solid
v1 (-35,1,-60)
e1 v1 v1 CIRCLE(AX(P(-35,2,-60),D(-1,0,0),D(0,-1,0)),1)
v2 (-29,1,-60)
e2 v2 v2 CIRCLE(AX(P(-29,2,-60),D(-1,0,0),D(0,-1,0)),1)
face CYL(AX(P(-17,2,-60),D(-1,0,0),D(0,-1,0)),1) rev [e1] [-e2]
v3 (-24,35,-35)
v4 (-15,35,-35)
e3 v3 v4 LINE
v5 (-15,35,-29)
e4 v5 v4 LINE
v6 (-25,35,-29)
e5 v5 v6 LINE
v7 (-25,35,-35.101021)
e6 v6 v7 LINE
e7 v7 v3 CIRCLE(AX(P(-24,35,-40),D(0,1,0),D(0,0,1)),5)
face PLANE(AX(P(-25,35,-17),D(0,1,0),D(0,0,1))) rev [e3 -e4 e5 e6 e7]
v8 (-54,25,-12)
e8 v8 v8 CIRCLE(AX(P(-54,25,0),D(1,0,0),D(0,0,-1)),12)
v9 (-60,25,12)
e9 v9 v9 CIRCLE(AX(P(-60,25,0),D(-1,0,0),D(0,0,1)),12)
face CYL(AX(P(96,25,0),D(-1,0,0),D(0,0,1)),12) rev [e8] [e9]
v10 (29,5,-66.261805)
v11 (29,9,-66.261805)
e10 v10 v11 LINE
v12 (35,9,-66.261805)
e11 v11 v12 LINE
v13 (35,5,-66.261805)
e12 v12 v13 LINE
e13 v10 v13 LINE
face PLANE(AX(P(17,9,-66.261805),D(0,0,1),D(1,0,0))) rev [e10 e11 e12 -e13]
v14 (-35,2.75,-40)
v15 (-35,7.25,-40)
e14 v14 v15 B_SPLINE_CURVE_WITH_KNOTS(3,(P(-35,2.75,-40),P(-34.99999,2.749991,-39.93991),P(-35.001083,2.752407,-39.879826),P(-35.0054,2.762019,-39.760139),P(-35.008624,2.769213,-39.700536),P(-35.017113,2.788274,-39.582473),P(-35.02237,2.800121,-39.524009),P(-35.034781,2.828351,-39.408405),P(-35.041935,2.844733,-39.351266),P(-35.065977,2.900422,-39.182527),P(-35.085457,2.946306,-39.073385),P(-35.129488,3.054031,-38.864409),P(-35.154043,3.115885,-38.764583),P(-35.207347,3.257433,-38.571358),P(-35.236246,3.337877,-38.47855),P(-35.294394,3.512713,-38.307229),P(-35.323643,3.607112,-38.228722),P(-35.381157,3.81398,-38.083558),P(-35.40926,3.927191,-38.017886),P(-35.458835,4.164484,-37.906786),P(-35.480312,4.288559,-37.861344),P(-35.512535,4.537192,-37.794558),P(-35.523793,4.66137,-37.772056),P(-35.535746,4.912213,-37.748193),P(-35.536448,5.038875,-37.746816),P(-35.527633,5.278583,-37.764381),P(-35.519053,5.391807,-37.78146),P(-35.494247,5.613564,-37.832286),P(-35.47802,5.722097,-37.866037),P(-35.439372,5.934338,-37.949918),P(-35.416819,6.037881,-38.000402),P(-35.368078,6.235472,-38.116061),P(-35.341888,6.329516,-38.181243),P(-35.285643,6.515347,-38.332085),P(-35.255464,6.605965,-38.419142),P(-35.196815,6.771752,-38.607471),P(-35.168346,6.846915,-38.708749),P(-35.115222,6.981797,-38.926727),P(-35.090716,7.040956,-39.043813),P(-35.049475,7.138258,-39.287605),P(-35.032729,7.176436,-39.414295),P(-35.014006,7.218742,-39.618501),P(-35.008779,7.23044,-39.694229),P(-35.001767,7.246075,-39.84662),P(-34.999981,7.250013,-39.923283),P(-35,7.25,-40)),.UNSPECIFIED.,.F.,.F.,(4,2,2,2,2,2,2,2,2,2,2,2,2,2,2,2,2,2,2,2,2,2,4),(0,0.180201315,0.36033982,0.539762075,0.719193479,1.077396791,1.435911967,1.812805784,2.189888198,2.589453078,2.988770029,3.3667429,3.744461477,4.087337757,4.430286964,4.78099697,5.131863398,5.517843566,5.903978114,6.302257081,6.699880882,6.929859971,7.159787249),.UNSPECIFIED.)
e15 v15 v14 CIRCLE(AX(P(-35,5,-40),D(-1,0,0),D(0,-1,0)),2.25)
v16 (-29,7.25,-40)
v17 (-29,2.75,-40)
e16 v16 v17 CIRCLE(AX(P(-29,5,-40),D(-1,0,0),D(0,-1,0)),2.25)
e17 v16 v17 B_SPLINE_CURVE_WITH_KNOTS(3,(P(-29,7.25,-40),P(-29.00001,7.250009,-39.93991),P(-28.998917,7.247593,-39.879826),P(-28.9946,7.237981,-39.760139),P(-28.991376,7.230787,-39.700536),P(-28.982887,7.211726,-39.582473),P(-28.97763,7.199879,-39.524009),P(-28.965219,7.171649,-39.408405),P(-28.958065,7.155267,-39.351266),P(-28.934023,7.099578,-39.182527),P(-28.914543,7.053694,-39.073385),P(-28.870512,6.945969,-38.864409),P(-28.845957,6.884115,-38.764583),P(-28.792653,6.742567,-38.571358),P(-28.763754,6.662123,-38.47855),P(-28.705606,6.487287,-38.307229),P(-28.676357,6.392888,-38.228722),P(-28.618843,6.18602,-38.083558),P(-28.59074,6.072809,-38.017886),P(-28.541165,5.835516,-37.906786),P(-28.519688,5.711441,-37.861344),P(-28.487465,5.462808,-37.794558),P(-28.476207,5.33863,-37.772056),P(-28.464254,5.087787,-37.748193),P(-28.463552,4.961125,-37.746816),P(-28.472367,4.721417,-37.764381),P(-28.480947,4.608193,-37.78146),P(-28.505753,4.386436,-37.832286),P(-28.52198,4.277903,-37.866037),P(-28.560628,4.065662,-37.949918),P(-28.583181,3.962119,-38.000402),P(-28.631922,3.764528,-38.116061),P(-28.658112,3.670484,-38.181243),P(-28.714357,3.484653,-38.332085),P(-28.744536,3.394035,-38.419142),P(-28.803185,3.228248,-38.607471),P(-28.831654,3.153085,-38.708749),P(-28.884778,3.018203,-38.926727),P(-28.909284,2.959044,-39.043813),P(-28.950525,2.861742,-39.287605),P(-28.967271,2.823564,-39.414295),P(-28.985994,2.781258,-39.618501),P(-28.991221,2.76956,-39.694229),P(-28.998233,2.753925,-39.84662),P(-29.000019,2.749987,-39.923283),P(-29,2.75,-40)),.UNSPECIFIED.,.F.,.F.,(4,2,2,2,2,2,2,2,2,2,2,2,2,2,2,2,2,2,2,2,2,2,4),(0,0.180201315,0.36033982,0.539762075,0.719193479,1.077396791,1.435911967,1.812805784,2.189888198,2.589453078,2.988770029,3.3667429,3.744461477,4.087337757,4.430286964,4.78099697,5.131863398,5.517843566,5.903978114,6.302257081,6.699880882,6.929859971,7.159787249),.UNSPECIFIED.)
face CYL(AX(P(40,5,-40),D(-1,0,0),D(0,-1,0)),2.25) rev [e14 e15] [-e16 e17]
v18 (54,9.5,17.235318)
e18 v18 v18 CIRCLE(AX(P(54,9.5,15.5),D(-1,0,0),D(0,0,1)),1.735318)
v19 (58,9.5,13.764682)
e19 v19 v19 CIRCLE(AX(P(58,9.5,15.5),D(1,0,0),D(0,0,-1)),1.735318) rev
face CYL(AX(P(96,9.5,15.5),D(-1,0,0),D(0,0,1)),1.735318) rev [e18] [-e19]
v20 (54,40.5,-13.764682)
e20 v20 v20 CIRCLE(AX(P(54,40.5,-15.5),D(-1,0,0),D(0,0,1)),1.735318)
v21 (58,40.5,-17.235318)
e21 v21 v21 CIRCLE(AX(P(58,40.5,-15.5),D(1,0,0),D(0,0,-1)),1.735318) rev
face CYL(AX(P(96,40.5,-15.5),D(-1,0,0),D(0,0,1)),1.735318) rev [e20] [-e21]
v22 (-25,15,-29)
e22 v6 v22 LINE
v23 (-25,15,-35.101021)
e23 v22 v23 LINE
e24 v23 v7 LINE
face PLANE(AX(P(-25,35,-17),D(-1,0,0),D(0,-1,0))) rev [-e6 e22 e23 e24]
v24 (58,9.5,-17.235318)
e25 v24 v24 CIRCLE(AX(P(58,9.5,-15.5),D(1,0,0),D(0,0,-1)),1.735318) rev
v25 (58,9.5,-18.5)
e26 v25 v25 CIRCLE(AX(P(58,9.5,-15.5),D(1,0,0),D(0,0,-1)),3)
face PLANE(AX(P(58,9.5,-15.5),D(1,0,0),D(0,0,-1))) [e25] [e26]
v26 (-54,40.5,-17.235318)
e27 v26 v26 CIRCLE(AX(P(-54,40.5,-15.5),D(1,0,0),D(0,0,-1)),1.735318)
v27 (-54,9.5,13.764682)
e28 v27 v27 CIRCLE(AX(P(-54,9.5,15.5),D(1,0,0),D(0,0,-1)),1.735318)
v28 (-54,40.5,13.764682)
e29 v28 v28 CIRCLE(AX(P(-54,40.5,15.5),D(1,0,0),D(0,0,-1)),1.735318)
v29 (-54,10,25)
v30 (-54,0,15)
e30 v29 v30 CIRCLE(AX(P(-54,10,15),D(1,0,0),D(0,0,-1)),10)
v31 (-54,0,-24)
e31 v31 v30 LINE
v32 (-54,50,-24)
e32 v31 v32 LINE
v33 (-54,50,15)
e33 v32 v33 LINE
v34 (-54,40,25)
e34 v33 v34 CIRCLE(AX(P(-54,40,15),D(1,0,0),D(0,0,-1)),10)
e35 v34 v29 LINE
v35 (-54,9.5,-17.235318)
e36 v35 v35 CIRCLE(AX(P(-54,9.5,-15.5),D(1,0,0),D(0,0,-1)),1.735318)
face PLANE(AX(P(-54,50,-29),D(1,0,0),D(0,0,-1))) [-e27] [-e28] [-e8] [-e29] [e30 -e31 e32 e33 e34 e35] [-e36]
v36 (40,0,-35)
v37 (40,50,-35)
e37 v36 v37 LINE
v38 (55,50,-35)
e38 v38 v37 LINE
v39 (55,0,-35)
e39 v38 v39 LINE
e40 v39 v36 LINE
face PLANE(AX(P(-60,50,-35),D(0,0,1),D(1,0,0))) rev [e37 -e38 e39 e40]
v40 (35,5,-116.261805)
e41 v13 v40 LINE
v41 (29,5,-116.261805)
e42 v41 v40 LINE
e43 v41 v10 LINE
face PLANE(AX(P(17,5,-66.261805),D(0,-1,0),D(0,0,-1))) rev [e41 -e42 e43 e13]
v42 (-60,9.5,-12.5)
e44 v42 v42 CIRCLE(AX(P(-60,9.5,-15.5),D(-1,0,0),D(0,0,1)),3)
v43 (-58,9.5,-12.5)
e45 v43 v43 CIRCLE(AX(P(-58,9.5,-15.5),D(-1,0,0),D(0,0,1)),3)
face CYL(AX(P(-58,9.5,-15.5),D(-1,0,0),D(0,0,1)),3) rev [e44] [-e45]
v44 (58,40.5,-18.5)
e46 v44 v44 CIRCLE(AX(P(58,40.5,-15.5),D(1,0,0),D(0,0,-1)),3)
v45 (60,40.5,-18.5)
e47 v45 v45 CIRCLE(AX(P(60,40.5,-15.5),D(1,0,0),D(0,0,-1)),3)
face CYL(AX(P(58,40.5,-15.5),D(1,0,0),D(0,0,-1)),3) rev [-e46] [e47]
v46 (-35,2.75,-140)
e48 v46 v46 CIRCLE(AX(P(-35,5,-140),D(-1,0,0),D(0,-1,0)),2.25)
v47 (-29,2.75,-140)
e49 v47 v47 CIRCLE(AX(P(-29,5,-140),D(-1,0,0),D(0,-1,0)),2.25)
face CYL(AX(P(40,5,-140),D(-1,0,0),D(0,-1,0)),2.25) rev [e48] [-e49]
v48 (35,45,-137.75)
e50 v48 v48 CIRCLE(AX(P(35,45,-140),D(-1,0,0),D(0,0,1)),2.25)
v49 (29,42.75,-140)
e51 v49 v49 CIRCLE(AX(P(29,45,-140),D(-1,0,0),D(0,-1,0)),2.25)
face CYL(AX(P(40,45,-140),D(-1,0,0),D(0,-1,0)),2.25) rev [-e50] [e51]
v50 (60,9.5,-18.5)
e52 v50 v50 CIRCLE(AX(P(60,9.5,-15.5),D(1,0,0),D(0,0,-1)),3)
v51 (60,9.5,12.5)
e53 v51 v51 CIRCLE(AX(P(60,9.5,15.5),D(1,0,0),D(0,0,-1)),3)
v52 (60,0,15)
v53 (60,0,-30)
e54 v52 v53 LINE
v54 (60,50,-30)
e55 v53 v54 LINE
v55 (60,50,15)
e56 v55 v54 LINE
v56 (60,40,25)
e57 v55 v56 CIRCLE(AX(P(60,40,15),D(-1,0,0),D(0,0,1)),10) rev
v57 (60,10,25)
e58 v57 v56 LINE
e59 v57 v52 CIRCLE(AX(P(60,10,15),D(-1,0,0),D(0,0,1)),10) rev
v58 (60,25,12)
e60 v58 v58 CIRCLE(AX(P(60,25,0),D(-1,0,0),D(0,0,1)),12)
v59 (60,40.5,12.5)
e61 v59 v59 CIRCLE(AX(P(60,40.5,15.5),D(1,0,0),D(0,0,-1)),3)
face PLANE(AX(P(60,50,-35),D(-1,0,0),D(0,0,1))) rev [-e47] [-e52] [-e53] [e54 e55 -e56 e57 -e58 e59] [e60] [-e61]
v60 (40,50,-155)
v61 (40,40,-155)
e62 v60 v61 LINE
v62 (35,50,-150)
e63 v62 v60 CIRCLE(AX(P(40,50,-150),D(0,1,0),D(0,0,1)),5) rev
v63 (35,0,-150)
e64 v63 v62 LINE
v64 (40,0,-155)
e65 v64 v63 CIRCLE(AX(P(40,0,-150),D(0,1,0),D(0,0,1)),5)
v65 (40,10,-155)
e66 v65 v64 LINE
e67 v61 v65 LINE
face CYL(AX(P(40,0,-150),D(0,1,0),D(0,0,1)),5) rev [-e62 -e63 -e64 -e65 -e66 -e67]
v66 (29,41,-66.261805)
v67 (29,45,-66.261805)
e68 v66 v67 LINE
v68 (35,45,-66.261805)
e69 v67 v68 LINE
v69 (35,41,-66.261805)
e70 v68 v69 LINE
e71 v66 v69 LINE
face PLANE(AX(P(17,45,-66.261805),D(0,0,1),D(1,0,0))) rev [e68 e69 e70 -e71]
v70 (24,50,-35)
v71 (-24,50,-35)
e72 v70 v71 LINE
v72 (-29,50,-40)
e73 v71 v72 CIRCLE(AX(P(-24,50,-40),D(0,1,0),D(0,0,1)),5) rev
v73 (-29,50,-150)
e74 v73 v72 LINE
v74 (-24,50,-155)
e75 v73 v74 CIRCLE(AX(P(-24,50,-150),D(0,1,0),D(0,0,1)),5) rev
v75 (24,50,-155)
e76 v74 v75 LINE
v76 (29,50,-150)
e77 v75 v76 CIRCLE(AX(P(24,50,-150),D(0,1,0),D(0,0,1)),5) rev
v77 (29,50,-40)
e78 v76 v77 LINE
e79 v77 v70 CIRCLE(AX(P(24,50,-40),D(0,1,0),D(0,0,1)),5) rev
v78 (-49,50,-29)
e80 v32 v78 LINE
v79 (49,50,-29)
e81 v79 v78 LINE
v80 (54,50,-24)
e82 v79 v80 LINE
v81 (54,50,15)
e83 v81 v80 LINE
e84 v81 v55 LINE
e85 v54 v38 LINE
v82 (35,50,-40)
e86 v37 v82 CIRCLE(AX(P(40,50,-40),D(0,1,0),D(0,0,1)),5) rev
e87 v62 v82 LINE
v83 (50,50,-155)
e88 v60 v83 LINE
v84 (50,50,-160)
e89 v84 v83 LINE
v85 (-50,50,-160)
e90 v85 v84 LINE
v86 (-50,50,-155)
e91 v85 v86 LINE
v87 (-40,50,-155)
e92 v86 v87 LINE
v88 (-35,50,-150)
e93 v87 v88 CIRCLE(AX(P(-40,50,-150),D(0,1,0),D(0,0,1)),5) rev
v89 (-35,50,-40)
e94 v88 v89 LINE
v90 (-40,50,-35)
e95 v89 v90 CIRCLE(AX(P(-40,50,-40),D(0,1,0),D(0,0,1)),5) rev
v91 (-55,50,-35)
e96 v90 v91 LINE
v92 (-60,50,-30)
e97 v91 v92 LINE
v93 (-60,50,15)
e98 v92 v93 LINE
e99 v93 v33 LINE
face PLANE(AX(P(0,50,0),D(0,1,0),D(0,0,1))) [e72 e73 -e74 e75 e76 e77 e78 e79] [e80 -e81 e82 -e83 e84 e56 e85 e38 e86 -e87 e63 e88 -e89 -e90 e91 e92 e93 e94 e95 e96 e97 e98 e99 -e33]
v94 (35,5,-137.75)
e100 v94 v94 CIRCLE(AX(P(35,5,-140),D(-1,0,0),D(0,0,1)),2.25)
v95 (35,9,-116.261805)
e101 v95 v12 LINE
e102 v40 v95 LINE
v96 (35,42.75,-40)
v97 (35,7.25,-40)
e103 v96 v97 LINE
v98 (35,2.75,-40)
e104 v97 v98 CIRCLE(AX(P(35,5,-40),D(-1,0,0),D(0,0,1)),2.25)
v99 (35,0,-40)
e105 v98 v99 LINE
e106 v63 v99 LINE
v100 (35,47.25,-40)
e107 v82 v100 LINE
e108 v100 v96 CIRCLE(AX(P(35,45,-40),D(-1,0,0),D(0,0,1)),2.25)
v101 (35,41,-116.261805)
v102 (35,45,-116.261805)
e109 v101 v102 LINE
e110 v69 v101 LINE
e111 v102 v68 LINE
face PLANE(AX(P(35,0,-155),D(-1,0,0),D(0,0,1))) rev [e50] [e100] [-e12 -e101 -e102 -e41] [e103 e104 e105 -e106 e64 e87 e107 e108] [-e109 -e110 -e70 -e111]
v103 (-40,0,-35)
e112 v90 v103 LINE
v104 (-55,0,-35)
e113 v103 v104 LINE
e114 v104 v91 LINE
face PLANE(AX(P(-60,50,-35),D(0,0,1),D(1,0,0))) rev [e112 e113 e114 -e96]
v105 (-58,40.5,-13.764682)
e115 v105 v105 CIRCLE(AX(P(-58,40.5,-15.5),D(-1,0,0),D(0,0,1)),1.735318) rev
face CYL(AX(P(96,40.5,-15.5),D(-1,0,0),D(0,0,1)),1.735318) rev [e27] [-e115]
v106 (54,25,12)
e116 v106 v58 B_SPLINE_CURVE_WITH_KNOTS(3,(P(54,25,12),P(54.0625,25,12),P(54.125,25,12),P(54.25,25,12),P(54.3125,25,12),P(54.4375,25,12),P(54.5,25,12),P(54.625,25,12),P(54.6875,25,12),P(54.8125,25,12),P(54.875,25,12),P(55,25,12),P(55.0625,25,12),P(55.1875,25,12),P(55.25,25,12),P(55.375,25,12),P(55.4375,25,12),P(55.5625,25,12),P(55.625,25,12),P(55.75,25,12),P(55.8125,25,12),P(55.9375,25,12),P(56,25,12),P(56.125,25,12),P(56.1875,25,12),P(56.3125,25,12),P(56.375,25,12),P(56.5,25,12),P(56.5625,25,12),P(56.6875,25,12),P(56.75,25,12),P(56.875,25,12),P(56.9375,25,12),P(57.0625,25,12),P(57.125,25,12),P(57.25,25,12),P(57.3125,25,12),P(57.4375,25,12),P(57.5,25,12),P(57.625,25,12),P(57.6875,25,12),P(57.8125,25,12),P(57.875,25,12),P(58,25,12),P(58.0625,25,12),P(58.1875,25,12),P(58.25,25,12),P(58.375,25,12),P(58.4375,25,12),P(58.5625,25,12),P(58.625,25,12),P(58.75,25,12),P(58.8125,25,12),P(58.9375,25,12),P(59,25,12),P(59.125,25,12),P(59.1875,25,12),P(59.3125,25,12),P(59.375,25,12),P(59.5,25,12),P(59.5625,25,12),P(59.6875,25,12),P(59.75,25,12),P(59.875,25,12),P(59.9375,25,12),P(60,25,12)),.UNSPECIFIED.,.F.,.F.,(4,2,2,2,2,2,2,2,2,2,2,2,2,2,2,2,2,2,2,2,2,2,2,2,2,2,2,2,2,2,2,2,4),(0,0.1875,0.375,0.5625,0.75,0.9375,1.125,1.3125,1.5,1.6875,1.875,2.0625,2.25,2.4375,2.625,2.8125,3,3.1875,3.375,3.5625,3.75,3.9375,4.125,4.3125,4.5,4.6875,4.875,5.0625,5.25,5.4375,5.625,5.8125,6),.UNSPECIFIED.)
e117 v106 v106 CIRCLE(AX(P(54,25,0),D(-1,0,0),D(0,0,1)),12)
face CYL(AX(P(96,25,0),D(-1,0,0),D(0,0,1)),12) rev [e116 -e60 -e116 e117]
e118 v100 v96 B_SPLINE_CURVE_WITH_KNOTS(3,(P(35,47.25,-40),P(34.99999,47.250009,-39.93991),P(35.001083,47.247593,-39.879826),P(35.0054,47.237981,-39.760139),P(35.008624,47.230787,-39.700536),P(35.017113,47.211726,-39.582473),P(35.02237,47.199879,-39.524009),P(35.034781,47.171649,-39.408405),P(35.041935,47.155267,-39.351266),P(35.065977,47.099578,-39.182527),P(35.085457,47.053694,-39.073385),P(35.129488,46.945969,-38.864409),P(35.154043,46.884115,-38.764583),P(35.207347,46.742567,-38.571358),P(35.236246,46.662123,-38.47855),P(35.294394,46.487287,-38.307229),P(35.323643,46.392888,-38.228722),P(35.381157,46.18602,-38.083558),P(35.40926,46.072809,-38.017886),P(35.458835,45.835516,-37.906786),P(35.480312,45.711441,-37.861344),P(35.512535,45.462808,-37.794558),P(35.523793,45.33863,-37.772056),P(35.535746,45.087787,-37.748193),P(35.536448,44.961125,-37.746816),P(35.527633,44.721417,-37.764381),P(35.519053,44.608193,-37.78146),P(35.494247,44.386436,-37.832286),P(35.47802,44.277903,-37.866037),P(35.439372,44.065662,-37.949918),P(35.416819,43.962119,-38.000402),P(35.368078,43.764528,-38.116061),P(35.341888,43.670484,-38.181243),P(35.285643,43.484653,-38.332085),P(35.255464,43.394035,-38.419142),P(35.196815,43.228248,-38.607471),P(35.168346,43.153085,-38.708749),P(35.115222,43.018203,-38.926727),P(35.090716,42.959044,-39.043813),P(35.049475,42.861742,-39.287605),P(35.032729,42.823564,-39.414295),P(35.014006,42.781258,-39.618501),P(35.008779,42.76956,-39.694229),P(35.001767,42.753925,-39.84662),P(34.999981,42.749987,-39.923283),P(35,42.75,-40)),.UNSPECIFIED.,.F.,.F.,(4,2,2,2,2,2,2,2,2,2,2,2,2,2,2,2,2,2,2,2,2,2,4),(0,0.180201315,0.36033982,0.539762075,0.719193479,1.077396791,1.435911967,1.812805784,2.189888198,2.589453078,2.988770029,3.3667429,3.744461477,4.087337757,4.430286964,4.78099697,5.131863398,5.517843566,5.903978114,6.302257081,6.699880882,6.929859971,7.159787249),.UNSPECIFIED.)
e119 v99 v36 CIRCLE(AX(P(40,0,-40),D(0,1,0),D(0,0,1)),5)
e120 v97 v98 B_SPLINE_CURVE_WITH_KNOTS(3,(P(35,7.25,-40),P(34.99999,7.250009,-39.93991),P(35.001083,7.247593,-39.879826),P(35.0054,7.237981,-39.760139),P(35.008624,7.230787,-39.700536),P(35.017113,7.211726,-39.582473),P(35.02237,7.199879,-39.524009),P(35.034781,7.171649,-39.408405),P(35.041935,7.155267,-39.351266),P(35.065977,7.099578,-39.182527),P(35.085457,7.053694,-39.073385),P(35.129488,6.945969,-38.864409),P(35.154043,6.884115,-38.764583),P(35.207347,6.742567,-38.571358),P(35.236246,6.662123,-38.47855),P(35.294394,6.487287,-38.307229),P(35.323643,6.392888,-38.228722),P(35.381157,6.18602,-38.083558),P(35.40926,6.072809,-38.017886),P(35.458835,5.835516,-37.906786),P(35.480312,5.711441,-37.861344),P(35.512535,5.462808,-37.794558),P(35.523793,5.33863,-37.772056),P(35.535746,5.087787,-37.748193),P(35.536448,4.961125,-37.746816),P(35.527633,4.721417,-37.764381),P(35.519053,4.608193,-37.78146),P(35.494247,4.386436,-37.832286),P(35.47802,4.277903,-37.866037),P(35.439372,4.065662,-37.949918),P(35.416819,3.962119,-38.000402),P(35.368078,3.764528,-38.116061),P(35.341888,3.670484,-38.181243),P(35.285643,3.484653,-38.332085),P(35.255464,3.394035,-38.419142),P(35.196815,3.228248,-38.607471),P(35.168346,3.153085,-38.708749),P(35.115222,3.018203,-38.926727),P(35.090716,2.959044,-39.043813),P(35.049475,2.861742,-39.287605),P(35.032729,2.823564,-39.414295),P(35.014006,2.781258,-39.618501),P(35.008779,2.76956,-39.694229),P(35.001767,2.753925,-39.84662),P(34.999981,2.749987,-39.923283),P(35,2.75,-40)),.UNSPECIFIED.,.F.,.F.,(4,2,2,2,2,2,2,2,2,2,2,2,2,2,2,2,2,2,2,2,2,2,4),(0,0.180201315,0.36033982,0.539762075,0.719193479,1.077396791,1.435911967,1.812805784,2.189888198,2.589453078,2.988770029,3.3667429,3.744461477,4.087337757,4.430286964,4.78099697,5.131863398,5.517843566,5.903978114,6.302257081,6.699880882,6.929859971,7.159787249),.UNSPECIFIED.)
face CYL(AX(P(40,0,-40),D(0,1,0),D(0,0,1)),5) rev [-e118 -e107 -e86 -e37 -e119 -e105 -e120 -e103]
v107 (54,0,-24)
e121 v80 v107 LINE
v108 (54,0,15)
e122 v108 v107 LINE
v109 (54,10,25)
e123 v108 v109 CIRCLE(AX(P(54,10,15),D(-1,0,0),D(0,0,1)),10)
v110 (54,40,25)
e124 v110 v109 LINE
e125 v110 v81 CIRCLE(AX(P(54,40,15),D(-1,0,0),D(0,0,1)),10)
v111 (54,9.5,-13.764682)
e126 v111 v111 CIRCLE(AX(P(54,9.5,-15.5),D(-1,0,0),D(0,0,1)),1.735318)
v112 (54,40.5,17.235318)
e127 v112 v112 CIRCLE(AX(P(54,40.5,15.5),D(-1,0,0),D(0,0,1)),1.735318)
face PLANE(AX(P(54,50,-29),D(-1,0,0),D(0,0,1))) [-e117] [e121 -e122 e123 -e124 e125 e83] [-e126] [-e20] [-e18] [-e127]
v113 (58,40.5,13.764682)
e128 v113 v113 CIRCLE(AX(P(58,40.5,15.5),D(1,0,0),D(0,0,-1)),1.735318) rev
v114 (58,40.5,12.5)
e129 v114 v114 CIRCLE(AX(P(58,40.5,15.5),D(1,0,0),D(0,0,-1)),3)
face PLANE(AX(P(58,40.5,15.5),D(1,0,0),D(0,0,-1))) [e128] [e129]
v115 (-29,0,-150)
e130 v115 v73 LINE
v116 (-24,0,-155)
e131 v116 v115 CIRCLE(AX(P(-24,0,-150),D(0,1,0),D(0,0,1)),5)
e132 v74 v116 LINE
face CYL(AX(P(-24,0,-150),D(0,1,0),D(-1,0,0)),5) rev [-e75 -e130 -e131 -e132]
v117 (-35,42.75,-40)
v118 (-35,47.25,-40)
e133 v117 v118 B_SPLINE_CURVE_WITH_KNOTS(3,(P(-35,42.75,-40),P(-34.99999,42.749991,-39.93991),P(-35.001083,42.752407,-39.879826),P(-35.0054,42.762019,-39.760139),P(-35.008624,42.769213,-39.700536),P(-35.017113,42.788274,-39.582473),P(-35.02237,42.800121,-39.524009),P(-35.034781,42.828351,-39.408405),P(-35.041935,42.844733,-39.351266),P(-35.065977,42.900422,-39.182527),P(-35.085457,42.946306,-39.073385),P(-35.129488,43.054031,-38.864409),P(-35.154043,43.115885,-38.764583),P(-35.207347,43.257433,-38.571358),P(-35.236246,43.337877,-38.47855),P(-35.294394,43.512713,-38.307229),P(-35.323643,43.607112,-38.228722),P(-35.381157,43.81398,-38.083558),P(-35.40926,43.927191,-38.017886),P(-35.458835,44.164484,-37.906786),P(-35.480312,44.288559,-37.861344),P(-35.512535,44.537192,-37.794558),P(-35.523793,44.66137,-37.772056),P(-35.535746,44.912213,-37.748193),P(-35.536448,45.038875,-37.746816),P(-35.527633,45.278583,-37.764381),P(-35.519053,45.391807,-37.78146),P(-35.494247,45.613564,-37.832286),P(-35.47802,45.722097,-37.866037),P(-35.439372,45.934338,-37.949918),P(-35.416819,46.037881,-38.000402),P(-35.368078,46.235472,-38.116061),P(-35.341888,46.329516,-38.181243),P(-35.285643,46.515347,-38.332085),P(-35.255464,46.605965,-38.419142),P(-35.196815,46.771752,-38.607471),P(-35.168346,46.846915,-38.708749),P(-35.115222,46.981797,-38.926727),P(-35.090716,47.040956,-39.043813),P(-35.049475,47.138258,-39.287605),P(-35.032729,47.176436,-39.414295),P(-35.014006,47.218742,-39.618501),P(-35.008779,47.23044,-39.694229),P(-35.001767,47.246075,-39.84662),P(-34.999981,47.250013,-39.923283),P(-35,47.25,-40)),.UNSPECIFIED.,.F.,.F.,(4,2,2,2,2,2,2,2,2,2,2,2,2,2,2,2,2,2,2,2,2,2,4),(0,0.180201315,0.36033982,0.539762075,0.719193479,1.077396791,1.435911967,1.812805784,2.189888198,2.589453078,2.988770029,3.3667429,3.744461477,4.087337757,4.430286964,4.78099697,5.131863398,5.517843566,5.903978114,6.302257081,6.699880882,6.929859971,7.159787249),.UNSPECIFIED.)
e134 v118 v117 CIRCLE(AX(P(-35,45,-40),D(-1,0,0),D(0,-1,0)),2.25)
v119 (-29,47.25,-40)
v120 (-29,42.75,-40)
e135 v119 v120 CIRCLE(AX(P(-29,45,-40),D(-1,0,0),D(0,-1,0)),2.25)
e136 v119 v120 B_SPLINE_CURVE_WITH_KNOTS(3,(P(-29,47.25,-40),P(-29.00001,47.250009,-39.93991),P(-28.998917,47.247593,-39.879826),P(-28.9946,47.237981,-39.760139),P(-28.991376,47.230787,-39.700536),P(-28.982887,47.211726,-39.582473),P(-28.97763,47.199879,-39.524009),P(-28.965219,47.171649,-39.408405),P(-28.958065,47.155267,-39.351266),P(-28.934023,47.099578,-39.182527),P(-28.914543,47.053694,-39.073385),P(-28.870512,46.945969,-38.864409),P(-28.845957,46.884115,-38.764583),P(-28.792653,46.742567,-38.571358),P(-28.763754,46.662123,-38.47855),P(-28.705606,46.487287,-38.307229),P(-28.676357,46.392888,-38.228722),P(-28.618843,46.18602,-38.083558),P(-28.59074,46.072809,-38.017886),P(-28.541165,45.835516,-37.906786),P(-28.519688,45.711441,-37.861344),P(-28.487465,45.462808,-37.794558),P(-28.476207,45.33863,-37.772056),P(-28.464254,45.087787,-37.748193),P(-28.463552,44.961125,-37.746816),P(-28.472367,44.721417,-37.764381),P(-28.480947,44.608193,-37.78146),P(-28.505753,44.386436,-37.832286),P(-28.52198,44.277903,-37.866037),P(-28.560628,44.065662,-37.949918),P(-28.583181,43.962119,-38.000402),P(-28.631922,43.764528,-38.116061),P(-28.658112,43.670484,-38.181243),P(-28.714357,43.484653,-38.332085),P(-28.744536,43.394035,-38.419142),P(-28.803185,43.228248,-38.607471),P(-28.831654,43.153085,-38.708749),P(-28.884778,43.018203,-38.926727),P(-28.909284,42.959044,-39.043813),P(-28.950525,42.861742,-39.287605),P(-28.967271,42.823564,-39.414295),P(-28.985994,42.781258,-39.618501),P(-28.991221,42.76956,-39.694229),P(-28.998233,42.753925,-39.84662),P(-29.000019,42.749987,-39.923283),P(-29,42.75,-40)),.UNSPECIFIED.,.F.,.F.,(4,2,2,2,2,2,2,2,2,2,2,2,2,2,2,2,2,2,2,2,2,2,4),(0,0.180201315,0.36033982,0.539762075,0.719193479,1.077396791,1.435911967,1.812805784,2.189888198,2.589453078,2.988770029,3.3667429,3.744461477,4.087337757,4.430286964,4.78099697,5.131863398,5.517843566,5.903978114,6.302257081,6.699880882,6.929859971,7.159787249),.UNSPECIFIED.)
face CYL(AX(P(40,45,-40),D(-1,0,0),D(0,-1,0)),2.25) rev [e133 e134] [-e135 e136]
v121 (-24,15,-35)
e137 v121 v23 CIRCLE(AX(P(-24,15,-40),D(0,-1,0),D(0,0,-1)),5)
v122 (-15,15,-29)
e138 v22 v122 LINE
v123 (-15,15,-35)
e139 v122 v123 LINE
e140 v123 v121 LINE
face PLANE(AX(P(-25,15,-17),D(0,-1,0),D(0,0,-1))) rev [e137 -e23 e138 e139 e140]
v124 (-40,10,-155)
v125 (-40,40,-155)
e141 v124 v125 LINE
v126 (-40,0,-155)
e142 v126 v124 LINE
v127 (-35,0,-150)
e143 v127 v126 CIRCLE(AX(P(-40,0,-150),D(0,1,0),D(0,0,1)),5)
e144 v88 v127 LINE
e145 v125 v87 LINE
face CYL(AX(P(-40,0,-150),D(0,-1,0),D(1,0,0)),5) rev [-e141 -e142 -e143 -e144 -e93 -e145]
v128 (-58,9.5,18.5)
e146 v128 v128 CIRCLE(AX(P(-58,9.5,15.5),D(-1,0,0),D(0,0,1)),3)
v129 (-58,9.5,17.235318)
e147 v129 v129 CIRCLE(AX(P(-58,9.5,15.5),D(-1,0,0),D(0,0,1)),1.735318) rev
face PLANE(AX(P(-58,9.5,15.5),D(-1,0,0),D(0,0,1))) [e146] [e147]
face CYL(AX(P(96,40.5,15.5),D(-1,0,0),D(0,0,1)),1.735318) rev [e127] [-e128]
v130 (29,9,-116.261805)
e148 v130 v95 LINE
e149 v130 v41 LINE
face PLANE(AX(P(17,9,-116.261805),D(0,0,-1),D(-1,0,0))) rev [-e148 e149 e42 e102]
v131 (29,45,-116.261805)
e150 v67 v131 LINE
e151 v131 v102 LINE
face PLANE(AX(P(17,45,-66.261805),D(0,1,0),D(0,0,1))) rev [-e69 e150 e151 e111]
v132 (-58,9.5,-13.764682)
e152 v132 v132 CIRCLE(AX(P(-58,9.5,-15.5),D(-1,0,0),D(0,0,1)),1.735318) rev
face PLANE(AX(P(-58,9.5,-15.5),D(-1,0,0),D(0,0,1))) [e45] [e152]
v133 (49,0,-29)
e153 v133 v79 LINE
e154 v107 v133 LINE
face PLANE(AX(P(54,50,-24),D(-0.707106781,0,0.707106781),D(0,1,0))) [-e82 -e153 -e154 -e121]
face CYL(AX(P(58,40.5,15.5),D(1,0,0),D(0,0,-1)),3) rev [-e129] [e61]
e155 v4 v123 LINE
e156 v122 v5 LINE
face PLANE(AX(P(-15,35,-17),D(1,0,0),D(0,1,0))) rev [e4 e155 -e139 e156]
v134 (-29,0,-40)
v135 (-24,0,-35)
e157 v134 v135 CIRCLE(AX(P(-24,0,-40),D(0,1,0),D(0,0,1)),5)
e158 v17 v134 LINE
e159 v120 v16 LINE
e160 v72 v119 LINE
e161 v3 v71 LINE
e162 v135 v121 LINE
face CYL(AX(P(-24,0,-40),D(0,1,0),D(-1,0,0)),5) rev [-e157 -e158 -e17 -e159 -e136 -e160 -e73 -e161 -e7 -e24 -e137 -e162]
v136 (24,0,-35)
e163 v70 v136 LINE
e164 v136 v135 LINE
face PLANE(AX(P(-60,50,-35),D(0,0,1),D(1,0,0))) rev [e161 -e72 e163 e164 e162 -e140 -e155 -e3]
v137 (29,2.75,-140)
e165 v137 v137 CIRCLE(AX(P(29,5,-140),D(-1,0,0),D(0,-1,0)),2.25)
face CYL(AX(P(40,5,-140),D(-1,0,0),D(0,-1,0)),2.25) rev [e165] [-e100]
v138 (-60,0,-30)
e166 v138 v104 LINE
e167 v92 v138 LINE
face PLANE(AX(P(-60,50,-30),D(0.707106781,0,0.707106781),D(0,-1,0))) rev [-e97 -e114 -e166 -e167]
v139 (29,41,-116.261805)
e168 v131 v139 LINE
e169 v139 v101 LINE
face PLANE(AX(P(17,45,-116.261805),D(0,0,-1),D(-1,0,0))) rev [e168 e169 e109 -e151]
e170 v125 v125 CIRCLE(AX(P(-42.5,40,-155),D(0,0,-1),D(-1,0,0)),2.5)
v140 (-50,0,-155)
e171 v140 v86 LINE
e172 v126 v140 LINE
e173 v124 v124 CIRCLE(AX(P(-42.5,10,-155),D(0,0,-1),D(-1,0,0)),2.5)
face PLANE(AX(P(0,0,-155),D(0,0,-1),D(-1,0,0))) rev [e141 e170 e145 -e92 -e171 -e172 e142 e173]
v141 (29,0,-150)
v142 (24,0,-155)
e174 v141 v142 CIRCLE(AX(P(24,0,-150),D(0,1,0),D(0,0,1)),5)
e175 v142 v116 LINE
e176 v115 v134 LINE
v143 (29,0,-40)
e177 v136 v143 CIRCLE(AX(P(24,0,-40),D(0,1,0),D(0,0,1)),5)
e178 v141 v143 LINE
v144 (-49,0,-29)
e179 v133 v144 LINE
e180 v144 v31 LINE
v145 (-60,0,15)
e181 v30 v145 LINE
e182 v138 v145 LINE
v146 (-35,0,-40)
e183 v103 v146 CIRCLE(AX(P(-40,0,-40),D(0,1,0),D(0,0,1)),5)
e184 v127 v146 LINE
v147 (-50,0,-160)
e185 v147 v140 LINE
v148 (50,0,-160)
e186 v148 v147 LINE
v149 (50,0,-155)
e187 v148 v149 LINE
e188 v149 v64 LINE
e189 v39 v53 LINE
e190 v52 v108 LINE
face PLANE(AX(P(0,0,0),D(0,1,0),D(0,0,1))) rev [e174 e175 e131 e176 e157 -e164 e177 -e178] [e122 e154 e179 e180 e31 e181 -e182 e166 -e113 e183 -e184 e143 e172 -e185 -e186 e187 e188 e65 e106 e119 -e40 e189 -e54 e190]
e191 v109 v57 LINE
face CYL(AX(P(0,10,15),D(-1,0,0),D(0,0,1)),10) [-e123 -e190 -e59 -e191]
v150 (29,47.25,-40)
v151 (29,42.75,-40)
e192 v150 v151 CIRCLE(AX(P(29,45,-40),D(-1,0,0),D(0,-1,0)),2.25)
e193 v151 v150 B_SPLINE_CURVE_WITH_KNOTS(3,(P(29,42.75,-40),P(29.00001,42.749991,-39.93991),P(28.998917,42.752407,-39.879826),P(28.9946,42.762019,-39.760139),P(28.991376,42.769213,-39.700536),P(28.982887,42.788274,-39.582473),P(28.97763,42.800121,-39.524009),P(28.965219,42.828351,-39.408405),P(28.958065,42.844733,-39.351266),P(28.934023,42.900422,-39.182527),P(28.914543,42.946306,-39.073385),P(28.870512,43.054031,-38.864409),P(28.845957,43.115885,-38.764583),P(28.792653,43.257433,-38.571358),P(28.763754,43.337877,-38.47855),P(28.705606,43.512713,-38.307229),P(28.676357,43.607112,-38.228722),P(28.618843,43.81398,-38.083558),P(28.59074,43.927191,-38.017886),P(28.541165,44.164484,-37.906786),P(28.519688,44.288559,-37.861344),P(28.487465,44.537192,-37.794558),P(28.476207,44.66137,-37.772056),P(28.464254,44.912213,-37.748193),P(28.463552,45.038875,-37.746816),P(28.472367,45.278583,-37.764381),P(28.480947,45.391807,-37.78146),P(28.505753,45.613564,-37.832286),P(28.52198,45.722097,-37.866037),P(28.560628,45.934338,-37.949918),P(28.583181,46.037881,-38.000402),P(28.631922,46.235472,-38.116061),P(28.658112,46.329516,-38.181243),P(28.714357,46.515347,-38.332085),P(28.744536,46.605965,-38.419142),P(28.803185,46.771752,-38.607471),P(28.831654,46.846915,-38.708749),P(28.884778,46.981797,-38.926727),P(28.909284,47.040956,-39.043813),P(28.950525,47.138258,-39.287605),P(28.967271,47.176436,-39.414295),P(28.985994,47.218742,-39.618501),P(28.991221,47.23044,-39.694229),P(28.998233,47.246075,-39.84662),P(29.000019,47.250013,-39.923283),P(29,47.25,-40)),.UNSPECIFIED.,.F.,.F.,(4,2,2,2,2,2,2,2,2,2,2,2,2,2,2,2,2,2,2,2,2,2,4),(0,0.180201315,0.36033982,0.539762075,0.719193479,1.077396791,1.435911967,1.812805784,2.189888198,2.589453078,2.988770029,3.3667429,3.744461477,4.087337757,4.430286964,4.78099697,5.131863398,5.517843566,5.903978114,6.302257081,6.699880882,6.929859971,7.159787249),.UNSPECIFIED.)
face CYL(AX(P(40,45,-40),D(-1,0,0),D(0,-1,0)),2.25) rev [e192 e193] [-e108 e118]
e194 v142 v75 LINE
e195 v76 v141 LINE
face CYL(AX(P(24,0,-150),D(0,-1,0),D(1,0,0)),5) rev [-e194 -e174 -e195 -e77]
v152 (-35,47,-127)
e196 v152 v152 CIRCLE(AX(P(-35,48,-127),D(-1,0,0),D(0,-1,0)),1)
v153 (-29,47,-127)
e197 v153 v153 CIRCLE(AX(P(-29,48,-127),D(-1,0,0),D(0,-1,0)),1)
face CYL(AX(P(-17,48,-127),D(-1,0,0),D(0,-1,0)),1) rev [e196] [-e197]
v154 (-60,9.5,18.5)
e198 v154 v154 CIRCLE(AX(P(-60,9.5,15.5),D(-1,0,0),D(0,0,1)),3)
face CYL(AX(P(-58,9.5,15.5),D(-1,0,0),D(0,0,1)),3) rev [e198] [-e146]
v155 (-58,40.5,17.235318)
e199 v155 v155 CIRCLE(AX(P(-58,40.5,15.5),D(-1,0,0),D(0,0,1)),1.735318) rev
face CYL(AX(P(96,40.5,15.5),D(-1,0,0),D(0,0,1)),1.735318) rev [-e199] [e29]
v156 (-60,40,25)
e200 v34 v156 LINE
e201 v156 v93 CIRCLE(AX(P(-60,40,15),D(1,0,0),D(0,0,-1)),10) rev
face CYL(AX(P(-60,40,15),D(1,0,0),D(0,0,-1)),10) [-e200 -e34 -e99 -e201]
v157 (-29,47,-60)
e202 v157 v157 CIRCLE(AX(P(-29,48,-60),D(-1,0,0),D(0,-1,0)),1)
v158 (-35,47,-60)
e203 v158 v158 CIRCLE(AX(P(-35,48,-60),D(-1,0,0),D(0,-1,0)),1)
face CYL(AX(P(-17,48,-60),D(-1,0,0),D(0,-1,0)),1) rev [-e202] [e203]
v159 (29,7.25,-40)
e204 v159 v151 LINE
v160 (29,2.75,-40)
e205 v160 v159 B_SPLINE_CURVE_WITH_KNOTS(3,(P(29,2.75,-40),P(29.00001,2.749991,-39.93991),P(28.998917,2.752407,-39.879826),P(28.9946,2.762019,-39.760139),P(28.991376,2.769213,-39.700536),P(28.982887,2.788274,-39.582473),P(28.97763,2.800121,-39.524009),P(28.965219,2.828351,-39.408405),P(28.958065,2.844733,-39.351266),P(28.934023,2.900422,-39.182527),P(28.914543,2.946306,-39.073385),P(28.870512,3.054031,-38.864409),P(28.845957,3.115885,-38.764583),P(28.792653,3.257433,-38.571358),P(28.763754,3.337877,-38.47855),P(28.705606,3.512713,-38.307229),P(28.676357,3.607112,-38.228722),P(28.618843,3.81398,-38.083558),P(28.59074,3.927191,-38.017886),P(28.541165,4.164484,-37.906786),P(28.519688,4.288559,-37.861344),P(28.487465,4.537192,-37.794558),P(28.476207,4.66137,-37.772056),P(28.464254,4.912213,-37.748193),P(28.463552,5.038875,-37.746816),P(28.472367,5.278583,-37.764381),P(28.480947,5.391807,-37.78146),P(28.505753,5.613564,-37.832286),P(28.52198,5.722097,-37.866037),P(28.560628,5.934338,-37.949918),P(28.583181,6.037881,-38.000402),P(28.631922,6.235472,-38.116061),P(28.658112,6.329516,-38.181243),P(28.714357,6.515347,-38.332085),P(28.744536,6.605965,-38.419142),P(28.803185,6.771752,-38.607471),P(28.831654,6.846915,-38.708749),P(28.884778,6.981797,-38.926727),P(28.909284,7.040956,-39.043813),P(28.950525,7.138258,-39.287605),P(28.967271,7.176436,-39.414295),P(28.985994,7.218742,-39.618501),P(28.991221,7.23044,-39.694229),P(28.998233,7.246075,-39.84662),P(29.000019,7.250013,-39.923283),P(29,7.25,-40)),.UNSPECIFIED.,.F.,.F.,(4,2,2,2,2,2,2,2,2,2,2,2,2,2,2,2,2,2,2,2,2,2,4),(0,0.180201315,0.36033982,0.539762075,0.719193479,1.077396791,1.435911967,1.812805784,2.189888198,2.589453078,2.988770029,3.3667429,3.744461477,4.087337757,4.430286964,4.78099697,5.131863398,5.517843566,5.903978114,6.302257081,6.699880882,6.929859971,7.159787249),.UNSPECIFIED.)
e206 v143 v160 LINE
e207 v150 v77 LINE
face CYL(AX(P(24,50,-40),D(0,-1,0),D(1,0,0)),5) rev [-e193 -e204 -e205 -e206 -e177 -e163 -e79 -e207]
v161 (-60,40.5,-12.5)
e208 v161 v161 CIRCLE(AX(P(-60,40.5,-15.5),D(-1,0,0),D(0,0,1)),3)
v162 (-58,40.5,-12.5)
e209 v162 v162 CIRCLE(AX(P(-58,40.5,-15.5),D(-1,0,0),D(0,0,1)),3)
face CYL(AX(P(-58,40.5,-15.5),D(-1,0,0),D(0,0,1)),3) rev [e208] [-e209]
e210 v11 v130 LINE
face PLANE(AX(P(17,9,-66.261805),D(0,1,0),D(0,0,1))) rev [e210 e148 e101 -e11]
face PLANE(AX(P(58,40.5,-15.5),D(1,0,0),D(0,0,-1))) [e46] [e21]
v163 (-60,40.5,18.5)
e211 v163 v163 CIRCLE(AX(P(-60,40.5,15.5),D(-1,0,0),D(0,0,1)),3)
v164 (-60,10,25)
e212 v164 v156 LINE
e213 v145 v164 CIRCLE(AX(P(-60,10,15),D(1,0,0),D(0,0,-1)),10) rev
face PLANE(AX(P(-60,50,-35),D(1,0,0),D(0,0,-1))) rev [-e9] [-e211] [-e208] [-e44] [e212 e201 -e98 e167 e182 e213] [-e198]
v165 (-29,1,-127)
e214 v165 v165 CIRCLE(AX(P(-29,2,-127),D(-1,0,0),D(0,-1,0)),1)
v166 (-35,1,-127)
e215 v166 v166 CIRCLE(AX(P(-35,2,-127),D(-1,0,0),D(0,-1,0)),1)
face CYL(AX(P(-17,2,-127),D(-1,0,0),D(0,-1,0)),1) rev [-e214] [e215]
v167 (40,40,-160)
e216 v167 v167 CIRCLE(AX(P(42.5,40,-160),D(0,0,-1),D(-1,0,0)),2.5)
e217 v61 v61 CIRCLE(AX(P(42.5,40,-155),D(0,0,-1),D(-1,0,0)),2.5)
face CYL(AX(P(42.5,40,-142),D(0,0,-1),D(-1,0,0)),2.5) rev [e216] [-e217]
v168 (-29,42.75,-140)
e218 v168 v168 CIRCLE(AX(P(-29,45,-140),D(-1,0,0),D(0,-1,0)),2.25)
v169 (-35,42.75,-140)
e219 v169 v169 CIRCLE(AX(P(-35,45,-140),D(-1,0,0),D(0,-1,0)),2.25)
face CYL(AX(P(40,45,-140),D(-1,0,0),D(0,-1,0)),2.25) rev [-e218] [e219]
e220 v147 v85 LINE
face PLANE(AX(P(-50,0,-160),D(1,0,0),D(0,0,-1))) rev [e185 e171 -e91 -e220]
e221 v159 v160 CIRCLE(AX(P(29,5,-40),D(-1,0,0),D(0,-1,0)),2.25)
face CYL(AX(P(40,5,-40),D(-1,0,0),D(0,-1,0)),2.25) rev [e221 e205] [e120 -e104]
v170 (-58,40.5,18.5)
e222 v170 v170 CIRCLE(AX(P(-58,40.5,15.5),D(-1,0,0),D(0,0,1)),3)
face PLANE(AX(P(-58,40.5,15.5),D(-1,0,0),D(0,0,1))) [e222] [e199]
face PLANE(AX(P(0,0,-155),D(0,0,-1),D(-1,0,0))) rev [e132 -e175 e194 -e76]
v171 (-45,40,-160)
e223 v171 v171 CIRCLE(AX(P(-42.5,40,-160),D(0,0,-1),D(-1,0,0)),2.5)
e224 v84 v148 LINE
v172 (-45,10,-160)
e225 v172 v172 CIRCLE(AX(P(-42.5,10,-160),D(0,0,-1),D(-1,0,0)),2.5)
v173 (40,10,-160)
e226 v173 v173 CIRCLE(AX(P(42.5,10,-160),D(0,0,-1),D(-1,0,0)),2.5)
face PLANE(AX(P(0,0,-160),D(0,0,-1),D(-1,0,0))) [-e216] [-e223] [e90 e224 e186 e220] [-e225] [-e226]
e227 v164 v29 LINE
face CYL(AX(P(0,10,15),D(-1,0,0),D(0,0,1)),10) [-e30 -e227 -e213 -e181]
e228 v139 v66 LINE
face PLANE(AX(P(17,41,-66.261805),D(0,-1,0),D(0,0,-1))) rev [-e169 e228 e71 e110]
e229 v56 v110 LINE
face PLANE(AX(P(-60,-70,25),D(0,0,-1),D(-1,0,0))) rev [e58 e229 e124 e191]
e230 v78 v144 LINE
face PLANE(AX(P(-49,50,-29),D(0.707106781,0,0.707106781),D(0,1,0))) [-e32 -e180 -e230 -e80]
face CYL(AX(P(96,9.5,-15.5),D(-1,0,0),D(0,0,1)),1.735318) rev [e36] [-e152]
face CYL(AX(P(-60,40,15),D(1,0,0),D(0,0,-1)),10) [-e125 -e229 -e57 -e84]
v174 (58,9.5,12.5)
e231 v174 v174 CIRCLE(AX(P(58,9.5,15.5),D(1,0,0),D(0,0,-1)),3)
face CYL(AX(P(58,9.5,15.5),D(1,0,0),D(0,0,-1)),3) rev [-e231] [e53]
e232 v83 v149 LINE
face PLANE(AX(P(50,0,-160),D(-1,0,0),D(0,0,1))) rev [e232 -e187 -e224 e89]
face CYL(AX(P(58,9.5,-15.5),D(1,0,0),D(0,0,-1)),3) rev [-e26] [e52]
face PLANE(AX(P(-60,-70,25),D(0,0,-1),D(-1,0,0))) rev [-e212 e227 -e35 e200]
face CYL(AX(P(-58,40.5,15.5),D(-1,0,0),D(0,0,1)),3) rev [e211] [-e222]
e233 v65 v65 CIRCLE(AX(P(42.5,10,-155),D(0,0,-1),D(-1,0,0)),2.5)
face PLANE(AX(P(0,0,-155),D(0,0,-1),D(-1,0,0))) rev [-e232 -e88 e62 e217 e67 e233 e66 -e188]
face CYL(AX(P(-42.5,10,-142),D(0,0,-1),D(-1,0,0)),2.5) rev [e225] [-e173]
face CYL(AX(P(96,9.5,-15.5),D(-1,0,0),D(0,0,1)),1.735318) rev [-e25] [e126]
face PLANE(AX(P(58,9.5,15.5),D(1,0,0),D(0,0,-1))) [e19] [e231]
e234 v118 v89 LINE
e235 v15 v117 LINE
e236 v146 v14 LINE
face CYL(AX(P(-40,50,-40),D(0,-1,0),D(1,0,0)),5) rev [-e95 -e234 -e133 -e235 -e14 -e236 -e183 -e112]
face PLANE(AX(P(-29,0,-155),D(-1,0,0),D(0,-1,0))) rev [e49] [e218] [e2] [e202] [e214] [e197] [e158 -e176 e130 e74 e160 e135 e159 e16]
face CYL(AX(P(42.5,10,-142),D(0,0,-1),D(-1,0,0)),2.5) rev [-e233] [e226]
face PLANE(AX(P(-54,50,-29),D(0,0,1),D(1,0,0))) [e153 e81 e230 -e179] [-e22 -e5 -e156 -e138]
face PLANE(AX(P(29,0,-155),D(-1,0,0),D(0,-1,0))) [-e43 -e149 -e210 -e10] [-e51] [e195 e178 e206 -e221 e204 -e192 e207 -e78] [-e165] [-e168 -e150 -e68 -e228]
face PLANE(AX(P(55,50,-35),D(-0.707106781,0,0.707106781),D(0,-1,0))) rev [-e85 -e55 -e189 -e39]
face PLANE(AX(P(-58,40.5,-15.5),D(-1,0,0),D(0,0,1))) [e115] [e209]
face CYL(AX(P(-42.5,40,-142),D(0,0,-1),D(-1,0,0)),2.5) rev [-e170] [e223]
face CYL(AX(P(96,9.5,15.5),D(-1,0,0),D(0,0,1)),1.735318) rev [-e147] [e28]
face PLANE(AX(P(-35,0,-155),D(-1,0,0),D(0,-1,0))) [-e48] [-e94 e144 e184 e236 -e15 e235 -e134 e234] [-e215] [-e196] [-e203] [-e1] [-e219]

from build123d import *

# Parameters (mm, degrees)
SKETCH1_W           = 120
SKETCH1_H           = 65
SKETCH1_W_2         = 108
SKETCH1_H_2         = 54
BOSS_EXTRUDE1_DEPTH = 50
SKETCH4_R           = 12
CUT_EXTRUDE1_DEPTH  = 156
SKETCH7_R           = 1.735318072
CUT_EXTRUDE2_DEPTH  = 156
SKETCH9_R           = 3
CUT_EXTRUDE3_DEPTH  = 2
CUT_EXTRUDE4_START  = -2
SKETCH10_R          = 3
CUT_EXTRUDE4_DEPTH  = 2
SKETCH11_W          = 6
SKETCH11_H          = 50
BOSS_EXTRUDE2_DEPTH = 120
SKETCH13_W          = 120
SKETCH13_H          = 5
CUT_EXTRUDE5_DEPTH  = 120
FILLET1_R           = 10
SKETCH14_W          = 100
SKETCH14_H          = 50
BOSS_EXTRUDE3_DEPTH = 5
SKETCH15_R          = 2.5
CUT_EXTRUDE6_DEPTH  = 18
SKETCH16_W          = 50
SKETCH16_H          = 4
CUT_EXTRUDE7_DEPTH  = 18
SKETCH17_R          = 1
CUT_EXTRUDE8_DEPTH  = 18
SKETCH18_W          = 10
SKETCH18_H          = 20
CUT_EXTRUDE9_DEPTH  = 18
SKETCH22_R          = 2.25
CUT_EXTRUDE13_DEPTH = 75
CHAMFER1_SIZE       = 5
CHAMFER2_SIZE       = 5
FILLET2_R           = 5


with BuildPart() as part:
    # Sketch1 → Boss-Extrude1 (new body)
    with BuildSketch(Plane(origin=(0, 0, 0), x_dir=(1, 0, 0), z_dir=(0, 1, 0))):
        with Locations((0, 2.5)):
            Rectangle(SKETCH1_W, SKETCH1_H)
        with Locations((0, 2)):
            Rectangle(SKETCH1_W_2, SKETCH1_H_2, mode=Mode.SUBTRACT)
    extrude(amount=BOSS_EXTRUDE1_DEPTH)

    # Sketch4 → Cut-Extrude1 (cut)
    with BuildSketch(Plane.ZY.offset(60)):
        with Locations((0, 25)):
            Circle(SKETCH4_R)
    extrude(amount=-CUT_EXTRUDE1_DEPTH, mode=Mode.SUBTRACT)

    # Sketch7 → Cut-Extrude2 (cut)
    with BuildSketch(Plane.ZY.offset(60)):
        with Locations((-15.5, 9.5)):
            Circle(SKETCH7_R)
        with Locations((-15.5, 40.5)):
            Circle(SKETCH7_R)
        with Locations((15.5, 9.5)):
            Circle(SKETCH7_R)
        with Locations((15.5, 40.5)):
            Circle(SKETCH7_R)
    extrude(amount=-CUT_EXTRUDE2_DEPTH, mode=Mode.SUBTRACT)

    # Sketch9 → Cut-Extrude3 (cut)
    with BuildSketch(Plane(origin=(60, 0, 0), x_dir=(0, 0, -1), z_dir=(1, 0, 0))):
        with Locations((15.5, 40.5)):
            Circle(SKETCH9_R)
        with Locations((15.5, 9.5)):
            Circle(SKETCH9_R)
        with Locations((-15.5, 9.5)):
            Circle(SKETCH9_R)
        with Locations((-15.5, 40.5)):
            Circle(SKETCH9_R)
    extrude(amount=-CUT_EXTRUDE3_DEPTH, mode=Mode.SUBTRACT)

    # Sketch10 → Cut-Extrude4 (cut)
    with BuildSketch(Plane.ZY.offset(60).offset(CUT_EXTRUDE4_START)):
        with Locations(Location((-15.5, 9.5, 0), (0, 0, 180))):
            Circle(SKETCH10_R)
        with Locations(Location((-15.5, 40.5, 0), (0, 0, 180))):
            Circle(SKETCH10_R)
        with Locations(Location((15.5, 40.5, 0), (0, 0, 180))):
            Circle(SKETCH10_R)
        with Locations(Location((15.5, 9.5, 0), (0, 0, 180))):
            Circle(SKETCH10_R)
    extrude(amount=CUT_EXTRUDE4_DEPTH, mode=Mode.SUBTRACT)

    # Sketch11 → Boss-Extrude2 (add)
    with BuildSketch(Plane(origin=(0, 0, -35), x_dir=(-1, 0, 0), z_dir=(0, 0, -1))):
        with Locations((-32, 25)):
            Rectangle(SKETCH11_W, SKETCH11_H)
        with Locations((32, 25)):
            Rectangle(SKETCH11_W, SKETCH11_H)
    extrude(amount=BOSS_EXTRUDE2_DEPTH)

    # Sketch13 → Cut-Extrude5 (cut)
    with BuildSketch(Plane(origin=(0, 50, 0), x_dir=(1, 0, 0), z_dir=(0, 1, 0))):
        with Locations((0, -27.5)):
            Rectangle(SKETCH13_W, SKETCH13_H)
    extrude(amount=-CUT_EXTRUDE5_DEPTH, mode=Mode.SUBTRACT)

    # Fillet1
    fillet1_edges = [part.edges().sort_by_distance(p)[0] for p in [
        (57, 0, 25),
        (-57, 0, 25),
        (57, 50, 25),
        (-57, 50, 25),
    ]]
    fillet(fillet1_edges, radius=FILLET1_R)

    # Sketch14 → Boss-Extrude3 (add)
    with BuildSketch(Plane(origin=(0, 0, -155), x_dir=(-1, 0, 0), z_dir=(0, 0, -1))):
        with Locations((0, 25)):
            Rectangle(SKETCH14_W, SKETCH14_H)
    extrude(amount=BOSS_EXTRUDE3_DEPTH)

    # Sketch15 → Cut-Extrude6 (cut)
    with BuildSketch(Plane(origin=(0, 0, -160), x_dir=(-1, 0, 0), z_dir=(0, 0, -1))):
        with Locations((-42.5, 10)):
            Circle(SKETCH15_R)
        with Locations((42.5, 10)):
            Circle(SKETCH15_R)
        with Locations((42.5, 40)):
            Circle(SKETCH15_R)
        with Locations((-42.5, 40)):
            Circle(SKETCH15_R)
    extrude(amount=-CUT_EXTRUDE6_DEPTH, mode=Mode.SUBTRACT)

    # Sketch16 → Cut-Extrude7 (cut)
    with BuildSketch(Plane(origin=(35, 0, 0), x_dir=(0, 0, -1), z_dir=(1, 0, 0))):
        with Locations((91.261804775, 43)):
            Rectangle(SKETCH16_W, SKETCH16_H)
        with Locations((91.261804775, 7)):
            Rectangle(SKETCH16_W, SKETCH16_H)
    extrude(amount=-CUT_EXTRUDE7_DEPTH, mode=Mode.SUBTRACT)

    # Sketch17 → Cut-Extrude8 (cut)
    with BuildSketch(Plane.ZY.offset(35)):
        with Locations(Location((-127, 2, 0), (0, 0, 270))):
            Circle(SKETCH17_R)
        with Locations(Location((-127, 48, 0), (0, 0, 270))):
            Circle(SKETCH17_R)
        with Locations(Location((-60, 2, 0), (0, 0, 270))):
            Circle(SKETCH17_R)
        with Locations(Location((-60, 48, 0), (0, 0, 270))):
            Circle(SKETCH17_R)
    extrude(amount=-CUT_EXTRUDE8_DEPTH, mode=Mode.SUBTRACT)

    # Sketch18 → Cut-Extrude9 (cut)
    with BuildSketch(Plane(origin=(0, 0, -35), x_dir=(-1, 0, 0), z_dir=(0, 0, -1))):
        with Locations((20, 25)):
            Rectangle(SKETCH18_W, SKETCH18_H)
    extrude(amount=-CUT_EXTRUDE9_DEPTH, mode=Mode.SUBTRACT)

    # Sketch22 → Cut-Extrude13 (cut)
    with BuildSketch(Plane.ZY.offset(35)):
        with Locations(Location((-140, 5, 0), (0, 0, 270))):
            Circle(SKETCH22_R)
        with Locations(Location((-140, 45, 0), (0, 0, 270))):
            Circle(SKETCH22_R)
        with Locations(Location((-40, 5, 0), (0, 0, 270))):
            Circle(SKETCH22_R)
        with Locations(Location((-40, 45, 0), (0, 0, 270))):
            Circle(SKETCH22_R)
    extrude(amount=-CUT_EXTRUDE13_DEPTH, mode=Mode.SUBTRACT)

    # Chamfer1
    chamfer1_edges = [part.edges().sort_by_distance(p)[0] for p in [
        (-60, 25, -35),
        (60, 25, -35),
    ]]
    chamfer(chamfer1_edges, length=CHAMFER1_SIZE)

    # Chamfer2
    chamfer2_edges = [part.edges().sort_by_distance(p)[0] for p in [
        (-54, 25, -29),
        (54, 25, -29),
    ]]
    chamfer(chamfer2_edges, length=CHAMFER2_SIZE)

    # Fillet2
    # the kernel refuses this fillet: 5 mm, written as the material it adds along each edge
    with BuildSketch(Plane(origin=(-29, 50, -155), x_dir=(1, 0, 0), z_dir=(0, -1, 0)), Plane(origin=(29, 0, -155), x_dir=(-1, 0, 0), z_dir=(0, 1, 0))) as fillet2_piece_1:
        with BuildLine():
            CenterArc((FILLET2_R, FILLET2_R), FILLET2_R, 180, 90)
            Line((0, FILLET2_R), (0, 0))
            Line((0, 0), (FILLET2_R, 0))
        make_face()
    extrude(amount=50)
    with BuildSketch(Plane(origin=(35, 50, -35), x_dir=(1, 0, 0), z_dir=(0, -1, 0))) as fillet2_piece_2_section:
        with BuildLine():
            CenterArc((FILLET2_R, -FILLET2_R), FILLET2_R, 90, 90)
            Line((0, -FILLET2_R), (0, 0))
            Line((0, 0), (FILLET2_R, 0))
        make_face()
    fillet2_piece_2 = extrude(amount=50, mode=Mode.PRIVATE)
    fillet2_piece_2 = fillet2_piece_2 - Plane(origin=(36.144503009, 45, -40), x_dir=(0, -1, 0), z_dir=(-1, 0, 0)) * Cylinder(2.25, 121, mode=Mode.PRIVATE)
    fillet2_piece_2 = fillet2_piece_2 - Plane(origin=(36.144503009, 5, -40), x_dir=(0, -1, 0), z_dir=(-1, 0, 0)) * Cylinder(2.25, 121, mode=Mode.PRIVATE)
    add(fillet2_piece_2)
    with BuildSketch(Plane(origin=(-29, 50, -35), x_dir=(0, 0, -1), z_dir=(0, -1, 0))) as fillet2_piece_3_section:
        with BuildLine():
            CenterArc((FILLET2_R, FILLET2_R), FILLET2_R, 180, 90)
            Line((0, FILLET2_R), (0, 0))
            Line((0, 0), (FILLET2_R, 0))
        make_face()
    fillet2_piece_3 = extrude(amount=50, mode=Mode.PRIVATE)
    fillet2_piece_3 = fillet2_piece_3 - Plane(origin=(-27.918643219, 45, -40), x_dir=(0, -1, 0), z_dir=(-1, 0, 0)) * Cylinder(2.25, 121, mode=Mode.PRIVATE)
    fillet2_piece_3 = split(fillet2_piece_3, bisect_by=Plane(origin=(-27.918643219, 35, -36.105806531), z_dir=(0, 1, 0)), keep=Keep.TOP, mode=Mode.PRIVATE)
    fillet2_piece_3 = split(fillet2_piece_3, bisect_by=Plane(origin=(-25, 42.450189762, -36.105806531), z_dir=(-1, 0, 0)), keep=Keep.TOP, mode=Mode.PRIVATE)
    add(fillet2_piece_3)
    with BuildSketch(Plane(origin=(-29, 50, -35), x_dir=(0, 0, -1), z_dir=(0, -1, 0))) as fillet2_piece_4_section:
        with BuildLine():
            CenterArc((FILLET2_R, FILLET2_R), FILLET2_R, 180, 90)
            Line((0, FILLET2_R), (0, 0))
            Line((0, 0), (FILLET2_R, 0))
        make_face()
    fillet2_piece_4 = extrude(amount=50, mode=Mode.PRIVATE)
    fillet2_piece_4 = split(fillet2_piece_4, bisect_by=Plane(origin=(-24.562912463, 35, -34.970154695), z_dir=(0, 1, 0)), keep=Keep.TOP, mode=Mode.PRIVATE)
    fillet2_piece_4 = split(fillet2_piece_4, bisect_by=Plane(origin=(-25, 42.5, -34.970154695), z_dir=(1, 0, 0)), keep=Keep.TOP, mode=Mode.PRIVATE)
    add(fillet2_piece_4)
    with BuildSketch(Plane(origin=(-29, 50, -35), x_dir=(0, 0, -1), z_dir=(0, -1, 0))) as fillet2_piece_5_section:
        with BuildLine():
            CenterArc((FILLET2_R, FILLET2_R), FILLET2_R, 180, 90)
            Line((0, FILLET2_R), (0, 0))
            Line((0, 0), (FILLET2_R, 0))
        make_face()
    fillet2_piece_5 = extrude(amount=50, mode=Mode.PRIVATE)
    fillet2_piece_5 = split(fillet2_piece_5, bisect_by=Plane(origin=(-27.938736848, 35, -36.15683257), z_dir=(0, -1, 0)), keep=Keep.TOP, mode=Mode.PRIVATE)
    fillet2_piece_5 = split(fillet2_piece_5, bisect_by=Plane(origin=(-27.938736848, 15, -36.15683257), z_dir=(0, 1, 0)), keep=Keep.TOP, mode=Mode.PRIVATE)
    fillet2_piece_5 = split(fillet2_piece_5, bisect_by=Plane(origin=(-25, 25, -36.15683257), z_dir=(-1, 0, 0)), keep=Keep.TOP, mode=Mode.PRIVATE)
    add(fillet2_piece_5)
    with BuildSketch(Plane(origin=(-29, 50, -35), x_dir=(0, 0, -1), z_dir=(0, -1, 0))) as fillet2_piece_6_section:
        with BuildLine():
            CenterArc((FILLET2_R, FILLET2_R), FILLET2_R, 180, 90)
            Line((0, FILLET2_R), (0, 0))
            Line((0, 0), (FILLET2_R, 0))
        make_face()
    fillet2_piece_6 = extrude(amount=50, mode=Mode.PRIVATE)
    fillet2_piece_6 = fillet2_piece_6 - Plane(origin=(-27.918643238, 5, -40), x_dir=(0, -1, 0), z_dir=(-1, 0, 0)) * Cylinder(2.25, 121, mode=Mode.PRIVATE)
    fillet2_piece_6 = split(fillet2_piece_6, bisect_by=Plane(origin=(-27.918643238, 15, -36.105806633), z_dir=(0, -1, 0)), keep=Keep.TOP, mode=Mode.PRIVATE)
    fillet2_piece_6 = split(fillet2_piece_6, bisect_by=Plane(origin=(-25, 7.54981005, -36.105806633), z_dir=(-1, 0, 0)), keep=Keep.TOP, mode=Mode.PRIVATE)
    add(fillet2_piece_6)
    with BuildSketch(Plane(origin=(-29, 50, -35), x_dir=(0, 0, -1), z_dir=(0, -1, 0))) as fillet2_piece_7_section:
        with BuildLine():
            CenterArc((FILLET2_R, FILLET2_R), FILLET2_R, 180, 90)
            Line((0, FILLET2_R), (0, 0))
            Line((0, 0), (FILLET2_R, 0))
        make_face()
    fillet2_piece_7 = extrude(amount=50, mode=Mode.PRIVATE)
    fillet2_piece_7 = split(fillet2_piece_7, bisect_by=Plane(origin=(-24.562912463, 15, -34.970154695), z_dir=(0, -1, 0)), keep=Keep.TOP, mode=Mode.PRIVATE)
    fillet2_piece_7 = split(fillet2_piece_7, bisect_by=Plane(origin=(-25, 7.5, -34.970154695), z_dir=(1, 0, 0)), keep=Keep.TOP, mode=Mode.PRIVATE)
    add(fillet2_piece_7)
    with BuildSketch(Plane(origin=(-35, 0, -35), x_dir=(-1, 0, 0), z_dir=(0, 1, 0))) as fillet2_piece_8_section:
        with BuildLine():
            CenterArc((FILLET2_R, -FILLET2_R), FILLET2_R, 90, 90)
            Line((0, -FILLET2_R), (0, 0))
            Line((0, 0), (FILLET2_R, 0))
        make_face()
    fillet2_piece_8 = extrude(amount=50, mode=Mode.PRIVATE)
    fillet2_piece_8 = fillet2_piece_8 - Plane(origin=(-36.144503009, 5, -40), x_dir=(0, -1, 0), z_dir=(-1, 0, 0)) * Cylinder(2.25, 121, mode=Mode.PRIVATE)
    fillet2_piece_8 = fillet2_piece_8 - Plane(origin=(-36.144503009, 45, -40), x_dir=(0, -1, 0), z_dir=(-1, 0, 0)) * Cylinder(2.25, 121, mode=Mode.PRIVATE)
    add(fillet2_piece_8)
    with BuildSketch(Plane(origin=(29, 0, -35), x_dir=(-1, 0, 0), z_dir=(0, 1, 0))) as fillet2_piece_9_section:
        with BuildLine():
            CenterArc((FILLET2_R, -FILLET2_R), FILLET2_R, 90, 90)
            Line((0, -FILLET2_R), (0, 0))
            Line((0, 0), (FILLET2_R, 0))
        make_face()
    fillet2_piece_9 = extrude(amount=50, mode=Mode.PRIVATE)
    fillet2_piece_9 = fillet2_piece_9 - Plane(origin=(27.855496991, 5, -40), x_dir=(0, -1, 0), z_dir=(-1, 0, 0)) * Cylinder(2.25, 121, mode=Mode.PRIVATE)
    fillet2_piece_9 = fillet2_piece_9 - Plane(origin=(27.855496991, 45, -40), x_dir=(0, -1, 0), z_dir=(-1, 0, 0)) * Cylinder(2.25, 121, mode=Mode.PRIVATE)
    add(fillet2_piece_9)
    with BuildSketch(Plane(origin=(-35, 0, -155), x_dir=(0, 0, 1), z_dir=(0, 1, 0)), Plane(origin=(35, 50, -155), x_dir=(0, 0, 1), z_dir=(0, -1, 0))) as fillet2_piece_10:
        with BuildLine():
            CenterArc((FILLET2_R, -FILLET2_R), FILLET2_R, 90, 90)
            Line((0, -FILLET2_R), (0, 0))
            Line((0, 0), (FILLET2_R, 0))
        make_face()
    extrude(amount=50)


solid = part.part
